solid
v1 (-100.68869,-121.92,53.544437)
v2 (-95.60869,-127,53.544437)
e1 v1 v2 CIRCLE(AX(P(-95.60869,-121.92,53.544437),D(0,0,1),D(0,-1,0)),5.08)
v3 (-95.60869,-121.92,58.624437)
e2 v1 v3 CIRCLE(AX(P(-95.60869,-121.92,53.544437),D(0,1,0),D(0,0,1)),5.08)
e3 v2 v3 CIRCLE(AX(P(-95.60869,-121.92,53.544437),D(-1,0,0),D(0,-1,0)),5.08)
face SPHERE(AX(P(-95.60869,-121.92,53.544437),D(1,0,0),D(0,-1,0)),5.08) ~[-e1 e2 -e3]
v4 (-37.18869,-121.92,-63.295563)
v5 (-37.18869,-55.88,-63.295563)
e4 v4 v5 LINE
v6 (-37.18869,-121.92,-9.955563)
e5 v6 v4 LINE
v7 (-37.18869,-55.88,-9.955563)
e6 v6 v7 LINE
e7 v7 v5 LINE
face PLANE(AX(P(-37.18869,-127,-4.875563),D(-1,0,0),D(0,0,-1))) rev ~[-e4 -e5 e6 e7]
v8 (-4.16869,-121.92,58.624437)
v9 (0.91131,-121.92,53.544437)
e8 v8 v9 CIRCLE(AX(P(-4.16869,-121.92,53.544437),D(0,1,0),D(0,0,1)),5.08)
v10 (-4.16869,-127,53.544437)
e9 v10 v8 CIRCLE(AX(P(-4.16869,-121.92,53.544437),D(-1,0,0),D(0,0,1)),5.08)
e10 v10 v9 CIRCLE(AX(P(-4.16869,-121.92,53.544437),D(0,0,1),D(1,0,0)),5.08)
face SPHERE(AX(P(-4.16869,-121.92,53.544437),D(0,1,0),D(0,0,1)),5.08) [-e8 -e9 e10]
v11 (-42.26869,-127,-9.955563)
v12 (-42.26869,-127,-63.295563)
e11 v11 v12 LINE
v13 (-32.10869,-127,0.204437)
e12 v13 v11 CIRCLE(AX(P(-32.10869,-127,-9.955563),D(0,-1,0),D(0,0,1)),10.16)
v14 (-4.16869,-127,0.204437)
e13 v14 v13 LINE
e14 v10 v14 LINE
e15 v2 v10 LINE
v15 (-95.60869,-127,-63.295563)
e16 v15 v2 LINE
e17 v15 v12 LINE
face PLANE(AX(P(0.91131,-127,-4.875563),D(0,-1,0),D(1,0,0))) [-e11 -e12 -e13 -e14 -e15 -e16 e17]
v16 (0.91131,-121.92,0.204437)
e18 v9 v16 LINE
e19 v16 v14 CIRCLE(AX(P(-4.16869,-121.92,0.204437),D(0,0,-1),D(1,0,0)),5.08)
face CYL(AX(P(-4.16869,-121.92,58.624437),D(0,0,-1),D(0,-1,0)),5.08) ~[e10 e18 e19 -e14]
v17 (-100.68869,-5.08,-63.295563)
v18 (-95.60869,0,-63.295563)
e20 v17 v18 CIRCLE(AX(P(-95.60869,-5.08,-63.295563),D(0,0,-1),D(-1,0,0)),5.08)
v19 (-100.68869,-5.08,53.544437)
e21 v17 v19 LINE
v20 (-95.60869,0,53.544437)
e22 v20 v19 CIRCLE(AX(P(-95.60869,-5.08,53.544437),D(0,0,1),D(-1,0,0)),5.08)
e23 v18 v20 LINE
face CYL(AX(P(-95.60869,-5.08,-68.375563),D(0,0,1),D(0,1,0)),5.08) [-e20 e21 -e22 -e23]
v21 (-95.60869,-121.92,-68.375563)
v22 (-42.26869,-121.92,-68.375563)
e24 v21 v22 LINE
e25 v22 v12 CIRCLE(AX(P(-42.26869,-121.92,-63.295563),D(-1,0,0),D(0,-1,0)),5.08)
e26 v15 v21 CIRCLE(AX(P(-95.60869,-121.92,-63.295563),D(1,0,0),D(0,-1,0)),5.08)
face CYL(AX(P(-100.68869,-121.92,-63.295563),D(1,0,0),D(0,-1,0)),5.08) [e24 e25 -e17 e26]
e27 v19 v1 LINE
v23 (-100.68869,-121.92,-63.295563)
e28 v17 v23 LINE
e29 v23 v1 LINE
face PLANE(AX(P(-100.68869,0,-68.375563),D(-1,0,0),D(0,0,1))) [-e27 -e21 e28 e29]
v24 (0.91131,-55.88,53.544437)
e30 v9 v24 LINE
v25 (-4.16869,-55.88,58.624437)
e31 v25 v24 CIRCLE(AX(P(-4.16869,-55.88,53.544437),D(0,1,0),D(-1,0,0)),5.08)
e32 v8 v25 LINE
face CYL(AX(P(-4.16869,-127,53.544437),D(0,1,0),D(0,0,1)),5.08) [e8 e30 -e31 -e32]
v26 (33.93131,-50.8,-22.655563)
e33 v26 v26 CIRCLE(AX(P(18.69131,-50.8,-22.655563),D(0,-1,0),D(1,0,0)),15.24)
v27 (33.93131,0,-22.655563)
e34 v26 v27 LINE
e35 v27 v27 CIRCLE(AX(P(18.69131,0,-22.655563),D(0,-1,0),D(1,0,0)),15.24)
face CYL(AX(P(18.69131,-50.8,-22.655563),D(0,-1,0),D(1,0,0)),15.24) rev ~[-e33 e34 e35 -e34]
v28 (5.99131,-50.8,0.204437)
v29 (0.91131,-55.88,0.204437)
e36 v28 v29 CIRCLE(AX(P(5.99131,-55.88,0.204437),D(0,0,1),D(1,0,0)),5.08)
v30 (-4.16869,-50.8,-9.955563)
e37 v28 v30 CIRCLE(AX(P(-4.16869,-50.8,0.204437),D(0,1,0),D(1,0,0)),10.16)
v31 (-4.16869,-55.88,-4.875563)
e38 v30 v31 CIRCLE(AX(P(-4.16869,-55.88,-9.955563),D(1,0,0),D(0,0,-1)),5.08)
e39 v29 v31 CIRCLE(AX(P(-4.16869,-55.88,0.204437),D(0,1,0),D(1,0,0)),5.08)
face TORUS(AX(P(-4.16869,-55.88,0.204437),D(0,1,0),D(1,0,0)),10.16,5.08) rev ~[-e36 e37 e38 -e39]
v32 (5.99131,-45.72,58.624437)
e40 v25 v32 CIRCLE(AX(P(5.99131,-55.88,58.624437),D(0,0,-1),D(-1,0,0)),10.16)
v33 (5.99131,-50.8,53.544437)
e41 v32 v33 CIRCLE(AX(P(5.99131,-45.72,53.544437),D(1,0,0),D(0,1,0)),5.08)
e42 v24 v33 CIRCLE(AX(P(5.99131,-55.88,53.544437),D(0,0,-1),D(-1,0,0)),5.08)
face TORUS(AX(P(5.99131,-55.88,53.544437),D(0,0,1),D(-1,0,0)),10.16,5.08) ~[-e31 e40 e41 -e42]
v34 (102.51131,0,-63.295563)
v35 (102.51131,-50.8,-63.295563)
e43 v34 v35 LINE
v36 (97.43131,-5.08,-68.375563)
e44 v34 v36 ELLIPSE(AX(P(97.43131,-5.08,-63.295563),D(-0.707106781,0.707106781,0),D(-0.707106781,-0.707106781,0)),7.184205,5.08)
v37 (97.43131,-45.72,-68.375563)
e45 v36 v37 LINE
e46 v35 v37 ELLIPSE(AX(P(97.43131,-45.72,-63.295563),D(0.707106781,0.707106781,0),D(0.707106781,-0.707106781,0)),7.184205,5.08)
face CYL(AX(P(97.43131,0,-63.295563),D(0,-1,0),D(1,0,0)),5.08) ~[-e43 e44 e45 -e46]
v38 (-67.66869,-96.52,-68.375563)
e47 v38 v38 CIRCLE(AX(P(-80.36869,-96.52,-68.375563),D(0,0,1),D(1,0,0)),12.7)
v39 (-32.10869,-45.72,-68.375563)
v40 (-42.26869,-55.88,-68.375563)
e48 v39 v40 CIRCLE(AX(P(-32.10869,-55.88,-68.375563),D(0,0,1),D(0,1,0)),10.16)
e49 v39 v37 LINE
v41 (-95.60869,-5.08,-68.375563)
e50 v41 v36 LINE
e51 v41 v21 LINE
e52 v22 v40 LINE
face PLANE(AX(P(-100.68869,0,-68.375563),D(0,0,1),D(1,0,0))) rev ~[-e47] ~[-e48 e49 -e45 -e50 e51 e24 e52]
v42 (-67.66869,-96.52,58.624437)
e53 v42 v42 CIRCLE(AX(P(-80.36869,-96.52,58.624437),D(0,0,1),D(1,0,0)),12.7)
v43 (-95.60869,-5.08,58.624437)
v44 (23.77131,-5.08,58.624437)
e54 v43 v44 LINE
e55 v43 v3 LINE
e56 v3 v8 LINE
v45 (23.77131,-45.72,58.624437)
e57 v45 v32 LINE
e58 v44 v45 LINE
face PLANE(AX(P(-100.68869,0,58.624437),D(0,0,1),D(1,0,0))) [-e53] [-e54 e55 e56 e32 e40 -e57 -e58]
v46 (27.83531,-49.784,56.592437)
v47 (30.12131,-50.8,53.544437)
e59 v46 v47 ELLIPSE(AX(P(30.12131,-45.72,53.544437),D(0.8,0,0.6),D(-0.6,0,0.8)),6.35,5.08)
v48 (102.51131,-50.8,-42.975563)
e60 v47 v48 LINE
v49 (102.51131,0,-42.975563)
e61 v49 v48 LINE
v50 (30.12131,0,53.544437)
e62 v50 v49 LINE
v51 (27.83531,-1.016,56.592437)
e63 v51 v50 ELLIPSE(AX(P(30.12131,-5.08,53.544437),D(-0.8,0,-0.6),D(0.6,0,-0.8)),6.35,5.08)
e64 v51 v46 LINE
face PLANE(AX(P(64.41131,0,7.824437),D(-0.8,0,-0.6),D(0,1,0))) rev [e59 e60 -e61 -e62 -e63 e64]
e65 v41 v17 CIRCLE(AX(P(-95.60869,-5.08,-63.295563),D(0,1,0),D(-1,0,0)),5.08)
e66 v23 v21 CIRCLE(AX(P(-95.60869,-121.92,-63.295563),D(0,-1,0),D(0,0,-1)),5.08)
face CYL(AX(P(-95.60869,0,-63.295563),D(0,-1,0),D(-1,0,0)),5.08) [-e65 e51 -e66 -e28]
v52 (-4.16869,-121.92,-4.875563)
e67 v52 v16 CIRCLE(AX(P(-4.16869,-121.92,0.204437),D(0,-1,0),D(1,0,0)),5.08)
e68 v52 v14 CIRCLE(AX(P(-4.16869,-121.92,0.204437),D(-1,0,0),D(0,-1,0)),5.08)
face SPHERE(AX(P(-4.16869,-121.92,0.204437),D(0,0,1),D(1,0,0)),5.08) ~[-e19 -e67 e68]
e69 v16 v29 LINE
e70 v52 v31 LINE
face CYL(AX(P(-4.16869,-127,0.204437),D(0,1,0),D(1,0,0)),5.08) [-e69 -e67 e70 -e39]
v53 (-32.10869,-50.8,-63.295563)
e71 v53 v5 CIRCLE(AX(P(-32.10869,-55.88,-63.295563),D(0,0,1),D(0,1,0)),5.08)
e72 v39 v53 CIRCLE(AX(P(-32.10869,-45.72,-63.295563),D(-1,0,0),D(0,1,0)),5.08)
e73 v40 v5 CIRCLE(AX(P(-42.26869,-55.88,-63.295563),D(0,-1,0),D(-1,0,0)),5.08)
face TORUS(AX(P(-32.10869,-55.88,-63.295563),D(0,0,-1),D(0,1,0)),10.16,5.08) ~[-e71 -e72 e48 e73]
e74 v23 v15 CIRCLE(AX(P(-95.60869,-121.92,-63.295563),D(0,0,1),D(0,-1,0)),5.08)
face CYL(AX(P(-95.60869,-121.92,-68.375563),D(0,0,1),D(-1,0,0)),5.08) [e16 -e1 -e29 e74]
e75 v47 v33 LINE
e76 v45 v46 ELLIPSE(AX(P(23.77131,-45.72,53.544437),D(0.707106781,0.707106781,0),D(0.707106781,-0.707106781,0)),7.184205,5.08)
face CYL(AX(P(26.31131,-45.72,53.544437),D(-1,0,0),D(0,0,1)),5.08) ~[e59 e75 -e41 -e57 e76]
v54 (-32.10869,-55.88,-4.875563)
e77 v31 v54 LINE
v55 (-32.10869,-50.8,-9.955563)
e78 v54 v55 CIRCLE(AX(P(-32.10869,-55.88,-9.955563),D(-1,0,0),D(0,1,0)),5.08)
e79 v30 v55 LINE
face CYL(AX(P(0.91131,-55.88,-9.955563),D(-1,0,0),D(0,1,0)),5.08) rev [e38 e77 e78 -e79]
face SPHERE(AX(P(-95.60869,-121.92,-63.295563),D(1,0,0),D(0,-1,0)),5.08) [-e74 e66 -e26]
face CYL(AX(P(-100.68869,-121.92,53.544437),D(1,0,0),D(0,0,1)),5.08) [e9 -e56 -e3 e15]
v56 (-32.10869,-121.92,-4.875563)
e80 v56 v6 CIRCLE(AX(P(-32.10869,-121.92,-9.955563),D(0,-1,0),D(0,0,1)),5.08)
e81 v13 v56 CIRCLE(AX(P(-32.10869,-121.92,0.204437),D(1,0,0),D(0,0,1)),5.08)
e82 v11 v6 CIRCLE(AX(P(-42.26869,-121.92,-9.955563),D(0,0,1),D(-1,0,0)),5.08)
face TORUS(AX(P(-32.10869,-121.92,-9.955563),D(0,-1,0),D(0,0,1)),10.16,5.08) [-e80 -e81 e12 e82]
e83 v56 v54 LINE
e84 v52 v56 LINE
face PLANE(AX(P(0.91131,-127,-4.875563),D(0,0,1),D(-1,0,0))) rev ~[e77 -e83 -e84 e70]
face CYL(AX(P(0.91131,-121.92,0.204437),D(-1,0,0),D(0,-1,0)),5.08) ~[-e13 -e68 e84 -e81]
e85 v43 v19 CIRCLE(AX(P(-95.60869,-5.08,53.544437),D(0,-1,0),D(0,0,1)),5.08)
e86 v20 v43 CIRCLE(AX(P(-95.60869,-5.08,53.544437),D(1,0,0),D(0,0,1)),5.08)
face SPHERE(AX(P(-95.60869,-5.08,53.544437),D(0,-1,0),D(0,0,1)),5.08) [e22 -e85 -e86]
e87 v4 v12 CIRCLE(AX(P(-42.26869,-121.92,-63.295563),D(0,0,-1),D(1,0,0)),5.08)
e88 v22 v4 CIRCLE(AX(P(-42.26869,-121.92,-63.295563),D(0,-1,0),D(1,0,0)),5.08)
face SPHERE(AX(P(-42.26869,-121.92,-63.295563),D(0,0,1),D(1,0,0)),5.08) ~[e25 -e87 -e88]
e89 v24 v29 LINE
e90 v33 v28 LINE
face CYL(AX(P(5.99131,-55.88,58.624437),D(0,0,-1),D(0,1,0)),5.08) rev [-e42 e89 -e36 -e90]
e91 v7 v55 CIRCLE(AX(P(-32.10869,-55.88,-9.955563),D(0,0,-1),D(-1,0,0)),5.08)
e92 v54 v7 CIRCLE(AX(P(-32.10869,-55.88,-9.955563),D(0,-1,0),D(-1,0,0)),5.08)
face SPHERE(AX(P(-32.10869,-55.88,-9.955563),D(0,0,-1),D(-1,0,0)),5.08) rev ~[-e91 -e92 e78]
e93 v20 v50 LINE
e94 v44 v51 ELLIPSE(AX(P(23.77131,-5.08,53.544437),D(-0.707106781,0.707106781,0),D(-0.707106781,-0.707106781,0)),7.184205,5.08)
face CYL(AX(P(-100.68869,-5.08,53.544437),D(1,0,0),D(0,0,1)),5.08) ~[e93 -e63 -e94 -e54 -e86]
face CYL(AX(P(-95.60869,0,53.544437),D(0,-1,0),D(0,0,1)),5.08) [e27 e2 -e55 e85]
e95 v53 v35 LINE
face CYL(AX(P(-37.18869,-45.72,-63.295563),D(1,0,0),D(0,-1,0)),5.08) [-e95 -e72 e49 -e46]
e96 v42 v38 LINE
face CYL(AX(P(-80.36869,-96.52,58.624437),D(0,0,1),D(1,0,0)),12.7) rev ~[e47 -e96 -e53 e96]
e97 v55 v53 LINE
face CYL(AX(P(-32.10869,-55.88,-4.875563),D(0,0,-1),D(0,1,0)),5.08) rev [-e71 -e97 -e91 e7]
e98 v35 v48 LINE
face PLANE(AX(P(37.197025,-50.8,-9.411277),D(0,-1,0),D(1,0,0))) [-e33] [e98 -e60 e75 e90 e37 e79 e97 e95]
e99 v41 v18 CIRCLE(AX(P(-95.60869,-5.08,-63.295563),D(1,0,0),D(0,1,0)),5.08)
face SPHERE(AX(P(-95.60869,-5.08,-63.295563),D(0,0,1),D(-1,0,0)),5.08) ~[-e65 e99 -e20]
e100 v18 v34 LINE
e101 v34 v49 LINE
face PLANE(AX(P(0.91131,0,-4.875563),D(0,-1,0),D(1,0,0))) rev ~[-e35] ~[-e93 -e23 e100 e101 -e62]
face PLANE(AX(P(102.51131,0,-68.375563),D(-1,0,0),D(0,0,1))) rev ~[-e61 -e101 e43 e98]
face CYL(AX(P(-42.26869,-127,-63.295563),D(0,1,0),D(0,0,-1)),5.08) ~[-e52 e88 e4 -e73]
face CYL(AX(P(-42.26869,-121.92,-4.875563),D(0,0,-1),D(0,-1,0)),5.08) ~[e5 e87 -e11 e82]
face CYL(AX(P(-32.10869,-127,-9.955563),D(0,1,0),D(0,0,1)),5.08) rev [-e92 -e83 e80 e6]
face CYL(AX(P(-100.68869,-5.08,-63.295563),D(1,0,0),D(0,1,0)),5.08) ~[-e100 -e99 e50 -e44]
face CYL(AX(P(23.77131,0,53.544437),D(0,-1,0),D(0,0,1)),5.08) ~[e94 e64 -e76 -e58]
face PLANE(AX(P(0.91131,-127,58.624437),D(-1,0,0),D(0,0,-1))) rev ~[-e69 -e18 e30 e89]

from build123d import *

# Parameters (mm, degrees)
F0_W     = 203.2
F0_H     = 127
F1_DEPTH = 127
F3_DEPTH = 76.2
F4_SIZE2 = 101.6
F4_SIZE  = 76.2
F5_R     = 5.08
F6_R     = 15.24
F7_DEPTH = 50.8
F8_R     = 12.7
F9_DEPTH = 127


with BuildPart() as f1:
    # F0 (on Front) → F1 (new body)
    with BuildSketch(Plane.XZ):
        with Locations((0.9113103151, -4.8755629536)):
            Rectangle(F0_W, F0_H)
    extrude(amount=F1_DEPTH)

    # F2 (on face) → F3 (cut)
    with BuildSketch(Plane.XZ.offset(127)):
        Polygon((102.5113103151, 58.6244370464), (0.9113103151, 58.6244370464), (0.9113103151, -4.8755629536), (-37.1886896849, -4.8755629536), (-37.1886896849, -68.3755629536), (102.5113103151, -68.3755629536), align=None)
    extrude(amount=-F3_DEPTH, mode=Mode.SUBTRACT)

    # F4
    f4_edges = [f1.edges().sort_by_distance(p)[0] for p in [
        (102.51131, -25.4, 58.624437),
    ]]
    f4_side = f1.faces().sort_by_distance((-20.860118, -52.614286, 58.624437))[0]
    chamfer(f4_edges, length=F4_SIZE, length2=F4_SIZE2, reference=f4_side)

    # F5
    f5_edges = [f1.edges().sort_by_distance(p)[0] for p in [
        (0.91131, -88.9, 58.624437),
        (26.31131, -25.4, 58.624437),
        (13.61131, -50.8, 58.624437),
        (-49.88869, -127, 58.624437),
        (0.91131, -127, 26.874437),
        (0.91131, -88.9, -4.875563),
        (-18.13869, -127, -4.875563),
        (-37.18869, -127, -36.625563),
        (32.66131, -50.8, -68.375563),
        (-37.18869, -88.9, -68.375563),
        (-68.93869, -127, -68.375563),
        (-100.68869, -127, -4.875563),
        (-100.68869, -63.5, 58.624437),
        (-37.18869, 0, 58.624437),
        (102.51131, -25.4, -68.375563),
        (-100.68869, 0, -4.875563),
        (-100.68869, -63.5, -68.375563),
        (0.91131, 0, -68.375563),
        (0.91131, -50.8, 26.874437),
        (-37.18869, -50.8, -36.625563),
        (-37.18869, -88.9, -4.875563),
        (-18.13869, -50.8, -4.875563),
    ]]
    fillet(f5_edges, radius=F5_R)

    # F6 (on face) → F7 (cut, through all)
    with BuildSketch(Plane.XZ.offset(50.8)):
        with Locations((18.6913103151, -22.6555629536)):
            Circle(F6_R)
    extrude(amount=-F7_DEPTH, mode=Mode.SUBTRACT)

    # F8 (on face) → F9 (cut, through all)
    with BuildSketch(Plane.XY.offset(58.6244370464)):
        with Locations((-80.3686896849, -96.52)):
            Circle(F8_R)
    extrude(amount=-F9_DEPTH, mode=Mode.SUBTRACT)


solid = f1.part
